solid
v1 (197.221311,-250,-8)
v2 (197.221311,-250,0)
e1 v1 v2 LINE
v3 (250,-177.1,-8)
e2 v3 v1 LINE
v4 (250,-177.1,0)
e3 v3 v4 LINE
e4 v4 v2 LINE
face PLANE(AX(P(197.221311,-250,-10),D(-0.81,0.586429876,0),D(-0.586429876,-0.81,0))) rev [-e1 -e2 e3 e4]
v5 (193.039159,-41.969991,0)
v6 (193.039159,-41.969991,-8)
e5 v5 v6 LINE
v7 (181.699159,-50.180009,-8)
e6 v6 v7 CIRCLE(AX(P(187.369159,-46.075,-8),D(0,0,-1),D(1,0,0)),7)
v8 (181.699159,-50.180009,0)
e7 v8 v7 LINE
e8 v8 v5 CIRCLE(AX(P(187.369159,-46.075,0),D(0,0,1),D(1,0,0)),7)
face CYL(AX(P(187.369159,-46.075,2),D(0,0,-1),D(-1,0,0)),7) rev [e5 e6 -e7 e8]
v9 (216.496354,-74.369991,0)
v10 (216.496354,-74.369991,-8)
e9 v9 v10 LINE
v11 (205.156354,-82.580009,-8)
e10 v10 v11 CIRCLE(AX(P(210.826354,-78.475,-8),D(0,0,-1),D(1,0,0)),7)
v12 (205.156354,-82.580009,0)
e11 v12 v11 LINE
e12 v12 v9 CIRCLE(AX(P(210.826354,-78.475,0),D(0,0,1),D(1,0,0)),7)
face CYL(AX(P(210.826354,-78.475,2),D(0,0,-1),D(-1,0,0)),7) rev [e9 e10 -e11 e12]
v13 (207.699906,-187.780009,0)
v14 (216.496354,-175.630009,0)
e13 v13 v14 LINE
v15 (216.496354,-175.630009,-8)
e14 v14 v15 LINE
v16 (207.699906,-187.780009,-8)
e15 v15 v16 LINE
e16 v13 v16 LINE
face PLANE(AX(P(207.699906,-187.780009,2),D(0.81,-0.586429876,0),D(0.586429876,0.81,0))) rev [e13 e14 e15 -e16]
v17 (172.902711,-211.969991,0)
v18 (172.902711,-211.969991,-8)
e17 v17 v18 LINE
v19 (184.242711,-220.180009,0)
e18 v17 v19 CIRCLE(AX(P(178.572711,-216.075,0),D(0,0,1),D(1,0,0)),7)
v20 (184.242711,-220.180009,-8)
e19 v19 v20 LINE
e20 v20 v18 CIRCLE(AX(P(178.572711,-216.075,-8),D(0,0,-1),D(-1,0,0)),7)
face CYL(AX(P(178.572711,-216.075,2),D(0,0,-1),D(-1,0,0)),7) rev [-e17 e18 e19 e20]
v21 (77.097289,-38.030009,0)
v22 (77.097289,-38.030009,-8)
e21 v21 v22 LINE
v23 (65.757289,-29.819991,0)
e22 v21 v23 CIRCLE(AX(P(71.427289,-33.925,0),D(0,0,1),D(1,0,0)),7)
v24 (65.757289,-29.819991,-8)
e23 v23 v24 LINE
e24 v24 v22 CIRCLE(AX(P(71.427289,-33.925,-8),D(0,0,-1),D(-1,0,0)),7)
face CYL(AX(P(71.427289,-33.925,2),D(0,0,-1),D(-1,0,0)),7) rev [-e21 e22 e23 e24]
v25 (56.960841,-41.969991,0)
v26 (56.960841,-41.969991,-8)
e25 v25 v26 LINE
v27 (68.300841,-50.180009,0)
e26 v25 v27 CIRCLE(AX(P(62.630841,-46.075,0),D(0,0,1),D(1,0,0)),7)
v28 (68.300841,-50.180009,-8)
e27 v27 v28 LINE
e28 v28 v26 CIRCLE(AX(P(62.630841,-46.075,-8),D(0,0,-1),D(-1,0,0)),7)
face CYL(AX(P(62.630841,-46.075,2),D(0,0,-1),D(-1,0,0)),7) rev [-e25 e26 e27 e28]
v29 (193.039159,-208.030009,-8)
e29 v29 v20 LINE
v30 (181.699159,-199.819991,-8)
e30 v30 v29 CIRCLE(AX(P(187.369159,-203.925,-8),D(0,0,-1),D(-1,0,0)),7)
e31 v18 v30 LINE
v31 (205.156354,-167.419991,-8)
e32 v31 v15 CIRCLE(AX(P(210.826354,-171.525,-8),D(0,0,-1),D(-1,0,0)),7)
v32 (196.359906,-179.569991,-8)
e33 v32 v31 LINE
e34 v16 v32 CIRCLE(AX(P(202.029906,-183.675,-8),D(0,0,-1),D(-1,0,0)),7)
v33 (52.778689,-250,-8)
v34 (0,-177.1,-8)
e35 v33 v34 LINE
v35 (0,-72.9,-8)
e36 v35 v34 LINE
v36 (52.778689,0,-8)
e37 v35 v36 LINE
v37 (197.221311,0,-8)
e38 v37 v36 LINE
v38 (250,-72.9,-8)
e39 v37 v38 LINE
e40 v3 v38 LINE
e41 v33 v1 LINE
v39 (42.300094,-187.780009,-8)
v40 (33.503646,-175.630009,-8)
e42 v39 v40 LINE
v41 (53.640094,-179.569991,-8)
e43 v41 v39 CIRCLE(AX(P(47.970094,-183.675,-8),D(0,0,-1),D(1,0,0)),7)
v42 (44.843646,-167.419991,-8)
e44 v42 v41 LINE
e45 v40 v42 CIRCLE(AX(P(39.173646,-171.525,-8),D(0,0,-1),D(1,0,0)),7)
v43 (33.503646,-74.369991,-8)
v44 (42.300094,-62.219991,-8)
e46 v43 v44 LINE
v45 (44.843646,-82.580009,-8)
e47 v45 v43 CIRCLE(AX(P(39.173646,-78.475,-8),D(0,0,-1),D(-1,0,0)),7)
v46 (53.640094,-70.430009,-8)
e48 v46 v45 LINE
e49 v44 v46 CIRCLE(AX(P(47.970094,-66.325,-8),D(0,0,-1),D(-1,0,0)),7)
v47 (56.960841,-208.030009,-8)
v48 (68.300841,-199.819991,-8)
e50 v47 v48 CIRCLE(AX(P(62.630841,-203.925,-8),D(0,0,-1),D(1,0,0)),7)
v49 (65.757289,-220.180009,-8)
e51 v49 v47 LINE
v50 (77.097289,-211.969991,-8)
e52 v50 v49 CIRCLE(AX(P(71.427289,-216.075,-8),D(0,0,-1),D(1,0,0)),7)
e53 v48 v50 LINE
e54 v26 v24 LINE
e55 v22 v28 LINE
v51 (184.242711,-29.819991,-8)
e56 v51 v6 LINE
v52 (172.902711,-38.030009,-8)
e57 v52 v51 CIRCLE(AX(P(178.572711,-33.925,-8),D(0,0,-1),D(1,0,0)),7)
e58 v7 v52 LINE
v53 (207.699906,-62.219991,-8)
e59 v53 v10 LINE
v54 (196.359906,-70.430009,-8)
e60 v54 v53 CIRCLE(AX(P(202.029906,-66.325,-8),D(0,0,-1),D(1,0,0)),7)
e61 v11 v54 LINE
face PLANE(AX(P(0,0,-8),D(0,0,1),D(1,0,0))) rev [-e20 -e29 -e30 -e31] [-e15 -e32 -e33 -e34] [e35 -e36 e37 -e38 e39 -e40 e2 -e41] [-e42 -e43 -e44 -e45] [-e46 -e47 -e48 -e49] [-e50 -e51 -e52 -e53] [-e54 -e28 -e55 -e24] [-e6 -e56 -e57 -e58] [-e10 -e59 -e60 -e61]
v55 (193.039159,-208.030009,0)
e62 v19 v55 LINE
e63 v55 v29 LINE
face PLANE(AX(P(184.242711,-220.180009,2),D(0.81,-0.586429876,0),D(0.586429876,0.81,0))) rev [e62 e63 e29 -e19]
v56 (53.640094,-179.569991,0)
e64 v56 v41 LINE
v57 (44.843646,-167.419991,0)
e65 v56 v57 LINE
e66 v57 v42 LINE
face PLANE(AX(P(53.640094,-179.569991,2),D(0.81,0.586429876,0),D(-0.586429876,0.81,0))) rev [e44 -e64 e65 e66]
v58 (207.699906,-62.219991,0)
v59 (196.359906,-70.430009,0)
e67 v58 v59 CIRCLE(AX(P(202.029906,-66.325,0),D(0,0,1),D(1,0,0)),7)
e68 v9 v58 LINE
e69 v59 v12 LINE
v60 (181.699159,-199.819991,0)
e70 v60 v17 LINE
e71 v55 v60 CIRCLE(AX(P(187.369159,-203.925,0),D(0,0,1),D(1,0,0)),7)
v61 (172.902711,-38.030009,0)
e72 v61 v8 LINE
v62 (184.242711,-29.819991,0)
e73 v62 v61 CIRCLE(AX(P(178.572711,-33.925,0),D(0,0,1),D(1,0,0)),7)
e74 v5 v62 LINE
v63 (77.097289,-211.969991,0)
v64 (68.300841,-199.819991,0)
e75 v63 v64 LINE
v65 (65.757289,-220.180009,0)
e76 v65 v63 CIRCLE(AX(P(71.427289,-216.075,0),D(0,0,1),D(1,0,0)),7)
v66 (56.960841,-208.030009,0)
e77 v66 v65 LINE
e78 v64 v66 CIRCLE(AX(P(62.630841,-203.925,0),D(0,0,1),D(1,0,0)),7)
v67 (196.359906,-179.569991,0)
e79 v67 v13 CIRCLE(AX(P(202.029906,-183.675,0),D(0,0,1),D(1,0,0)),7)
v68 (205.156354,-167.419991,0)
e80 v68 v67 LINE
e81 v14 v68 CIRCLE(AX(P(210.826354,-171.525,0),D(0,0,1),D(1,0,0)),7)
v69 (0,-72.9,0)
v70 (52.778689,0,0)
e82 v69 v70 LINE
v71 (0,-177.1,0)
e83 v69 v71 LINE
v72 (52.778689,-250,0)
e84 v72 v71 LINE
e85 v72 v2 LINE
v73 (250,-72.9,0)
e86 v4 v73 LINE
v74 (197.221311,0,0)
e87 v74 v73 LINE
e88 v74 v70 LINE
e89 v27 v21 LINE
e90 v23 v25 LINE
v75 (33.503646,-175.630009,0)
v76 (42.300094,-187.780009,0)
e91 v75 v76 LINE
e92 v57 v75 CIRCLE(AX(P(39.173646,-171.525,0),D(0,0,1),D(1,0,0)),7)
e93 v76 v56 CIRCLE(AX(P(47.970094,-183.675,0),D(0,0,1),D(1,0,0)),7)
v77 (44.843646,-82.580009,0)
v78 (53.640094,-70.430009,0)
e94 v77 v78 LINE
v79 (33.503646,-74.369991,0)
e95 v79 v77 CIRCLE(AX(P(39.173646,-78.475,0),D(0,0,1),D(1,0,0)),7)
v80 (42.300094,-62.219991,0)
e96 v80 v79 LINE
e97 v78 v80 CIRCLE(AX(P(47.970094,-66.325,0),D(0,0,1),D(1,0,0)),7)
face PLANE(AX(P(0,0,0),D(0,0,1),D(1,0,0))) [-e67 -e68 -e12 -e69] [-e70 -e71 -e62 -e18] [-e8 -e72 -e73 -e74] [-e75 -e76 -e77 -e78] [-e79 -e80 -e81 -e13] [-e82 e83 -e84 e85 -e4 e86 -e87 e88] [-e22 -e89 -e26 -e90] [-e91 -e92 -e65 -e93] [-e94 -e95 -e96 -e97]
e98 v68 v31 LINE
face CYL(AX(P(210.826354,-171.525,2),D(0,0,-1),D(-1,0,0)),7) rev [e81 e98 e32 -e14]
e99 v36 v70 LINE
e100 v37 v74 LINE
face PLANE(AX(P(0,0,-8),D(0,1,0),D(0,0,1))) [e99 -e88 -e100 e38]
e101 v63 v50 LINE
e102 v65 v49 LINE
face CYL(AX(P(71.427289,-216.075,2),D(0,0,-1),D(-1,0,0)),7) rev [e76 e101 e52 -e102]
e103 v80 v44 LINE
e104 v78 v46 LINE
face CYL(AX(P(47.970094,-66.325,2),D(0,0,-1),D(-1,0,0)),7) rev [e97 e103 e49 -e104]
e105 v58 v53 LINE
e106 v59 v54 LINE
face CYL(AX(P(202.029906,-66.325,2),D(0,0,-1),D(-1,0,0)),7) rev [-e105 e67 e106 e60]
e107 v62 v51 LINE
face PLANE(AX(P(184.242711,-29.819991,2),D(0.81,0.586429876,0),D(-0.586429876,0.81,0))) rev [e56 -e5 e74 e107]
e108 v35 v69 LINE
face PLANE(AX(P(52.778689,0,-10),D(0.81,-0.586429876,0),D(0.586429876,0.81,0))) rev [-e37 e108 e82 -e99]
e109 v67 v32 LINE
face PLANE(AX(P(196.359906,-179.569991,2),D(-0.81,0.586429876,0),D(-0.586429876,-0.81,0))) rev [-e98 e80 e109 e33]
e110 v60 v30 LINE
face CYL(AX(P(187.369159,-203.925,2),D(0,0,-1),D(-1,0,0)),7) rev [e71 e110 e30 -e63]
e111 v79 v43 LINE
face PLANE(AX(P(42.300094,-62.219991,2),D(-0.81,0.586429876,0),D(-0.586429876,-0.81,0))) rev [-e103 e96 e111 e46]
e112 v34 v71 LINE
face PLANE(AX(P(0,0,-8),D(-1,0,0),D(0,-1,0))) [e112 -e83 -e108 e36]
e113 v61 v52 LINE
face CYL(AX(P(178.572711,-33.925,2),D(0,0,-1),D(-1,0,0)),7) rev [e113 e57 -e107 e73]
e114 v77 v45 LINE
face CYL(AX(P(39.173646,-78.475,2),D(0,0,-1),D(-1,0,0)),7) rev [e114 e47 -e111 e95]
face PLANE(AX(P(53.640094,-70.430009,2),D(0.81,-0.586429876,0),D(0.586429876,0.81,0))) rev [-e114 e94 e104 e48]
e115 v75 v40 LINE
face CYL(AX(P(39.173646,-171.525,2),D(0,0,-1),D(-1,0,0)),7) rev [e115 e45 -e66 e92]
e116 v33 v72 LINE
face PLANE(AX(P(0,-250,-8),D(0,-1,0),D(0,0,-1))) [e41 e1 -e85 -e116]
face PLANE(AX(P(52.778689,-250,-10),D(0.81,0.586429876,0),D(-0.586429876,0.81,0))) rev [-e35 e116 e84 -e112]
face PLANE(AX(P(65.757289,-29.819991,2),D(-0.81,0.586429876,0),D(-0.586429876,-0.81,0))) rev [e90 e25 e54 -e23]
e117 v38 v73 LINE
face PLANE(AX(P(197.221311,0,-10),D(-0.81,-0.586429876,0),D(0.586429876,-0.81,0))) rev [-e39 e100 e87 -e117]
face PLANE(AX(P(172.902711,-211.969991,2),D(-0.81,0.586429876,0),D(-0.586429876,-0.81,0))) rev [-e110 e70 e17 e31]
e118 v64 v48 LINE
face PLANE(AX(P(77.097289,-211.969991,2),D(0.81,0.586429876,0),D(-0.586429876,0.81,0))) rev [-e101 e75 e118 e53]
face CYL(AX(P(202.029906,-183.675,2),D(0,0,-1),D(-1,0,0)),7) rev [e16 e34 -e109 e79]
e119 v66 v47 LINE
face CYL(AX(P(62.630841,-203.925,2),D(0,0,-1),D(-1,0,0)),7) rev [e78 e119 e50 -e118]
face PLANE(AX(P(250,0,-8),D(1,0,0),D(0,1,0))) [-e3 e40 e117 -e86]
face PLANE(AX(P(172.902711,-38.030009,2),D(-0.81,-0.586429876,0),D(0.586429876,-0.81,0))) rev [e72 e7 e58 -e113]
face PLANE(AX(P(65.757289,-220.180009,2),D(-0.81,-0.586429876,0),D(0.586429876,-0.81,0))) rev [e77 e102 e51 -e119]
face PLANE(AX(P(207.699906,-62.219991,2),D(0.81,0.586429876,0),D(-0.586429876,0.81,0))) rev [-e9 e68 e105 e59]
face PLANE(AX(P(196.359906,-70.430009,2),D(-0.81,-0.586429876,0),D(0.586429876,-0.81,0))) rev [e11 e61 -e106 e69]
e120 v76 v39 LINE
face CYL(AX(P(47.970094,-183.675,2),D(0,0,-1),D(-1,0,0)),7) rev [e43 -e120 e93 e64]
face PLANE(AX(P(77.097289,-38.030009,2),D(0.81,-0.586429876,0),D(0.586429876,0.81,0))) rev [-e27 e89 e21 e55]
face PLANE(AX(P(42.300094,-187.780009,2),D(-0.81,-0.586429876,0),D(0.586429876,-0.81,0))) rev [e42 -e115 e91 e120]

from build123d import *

# Parameters (mm, degrees)
SKETCH_1_W             = 250
SKETCH_1_H             = 250
SM_BASE_FLANGE_1_DEPTH = 8
CUT_EXTRUDE_1_DEPTH    = 10
CUT_EXTRUDE_2_DEPTH    = 10


# Sheet-metal steps are written as plain solids
with BuildPart() as part:
    # Sketch 1 → Базовая кромка1 (new body)
    with BuildSketch(Plane.XY):
        with Locations((125, -125)):
            Rectangle(SKETCH_1_W, SKETCH_1_H)
    extrude(amount=-SM_BASE_FLANGE_1_DEPTH)

    # Sketch 2 → Вырез-Вытянуть1 (cut)
    with BuildSketch(Plane.XY):
        Polygon((52.778688881, 0), (0, -72.9), (0, 0), align=None)
        Polygon((250, 0), (197.221311119, 0), (250, -72.9), align=None)
        Polygon((197.221311119, -250), (250, -177.1), (250, -250), align=None)
        Polygon((0, -250), (52.778688881, -250), (0, -177.1), align=None)
    extrude(amount=-CUT_EXTRUDE_1_DEPTH, mode=Mode.SUBTRACT)

    # Эскиз3 → Вырез-Вытянуть2 (cut)
    with BuildSketch(Plane(origin=(0, 0, -8), x_dir=(-1, 0, 0), z_dir=(0, 0, -1))):
        with BuildLine():
            Line((-65.757289426, -29.819990865), (-56.960841279, -41.969990865))
            ThreePointArc((-56.960841279, -41.969990865), (-58.525832144, -51.745), (-68.300841279, -50.180009135))
            Line((-68.300841279, -50.180009135), (-77.097289426, -38.030009135))
            ThreePointArc((-77.097289426, -38.030009135), (-75.532298561, -28.255), (-65.757289426, -29.819990865))
        make_face()
        with BuildLine():
            Line((-42.300094368, -62.219990865), (-33.503646221, -74.369990865))
            ThreePointArc((-33.503646221, -74.369990865), (-35.068637085, -84.145), (-44.843646221, -82.580009135))
            Line((-44.843646221, -82.580009135), (-53.640094368, -70.430009135))
            ThreePointArc((-53.640094368, -70.430009135), (-52.075103503, -60.655), (-42.300094368, -62.219990865))
        make_face()
        with BuildLine():
            Line((-184.242710574, -29.819990865), (-193.039158721, -41.969990865))
            ThreePointArc((-193.039158721, -41.969990865), (-191.474167856, -51.745), (-181.699158721, -50.180009135))
            Line((-181.699158721, -50.180009135), (-172.902710574, -38.030009135))
            ThreePointArc((-172.902710574, -38.030009135), (-174.467701439, -28.255), (-184.242710574, -29.819990865))
        make_face()
        with BuildLine():
            Line((-207.699905632, -62.219990865), (-216.496353779, -74.369990865))
            ThreePointArc((-216.496353779, -74.369990865), (-214.931362915, -84.145), (-205.156353779, -82.580009135))
            Line((-205.156353779, -82.580009135), (-196.359905632, -70.430009135))
            ThreePointArc((-196.359905632, -70.430009135), (-197.924896497, -60.655), (-207.699905632, -62.219990865))
        make_face()
        with BuildLine():
            Line((-65.757289426, -220.180009135), (-56.960841279, -208.030009135))
            ThreePointArc((-56.960841279, -208.030009135), (-58.525832144, -198.255), (-68.300841279, -199.819990865))
            Line((-68.300841279, -199.819990865), (-77.097289426, -211.969990865))
            ThreePointArc((-77.097289426, -211.969990865), (-75.532298561, -221.745), (-65.757289426, -220.180009135))
        make_face()
        with BuildLine():
            Line((-42.300094368, -187.780009135), (-33.503646221, -175.630009135))
            ThreePointArc((-33.503646221, -175.630009135), (-35.068637085, -165.855), (-44.843646221, -167.419990865))
            Line((-44.843646221, -167.419990865), (-53.640094368, -179.569990865))
            ThreePointArc((-53.640094368, -179.569990865), (-52.075103503, -189.345), (-42.300094368, -187.780009135))
        make_face()
        with BuildLine():
            Line((-184.242710574, -220.180009135), (-193.039158721, -208.030009135))
            ThreePointArc((-193.039158721, -208.030009135), (-191.474167856, -198.255), (-181.699158721, -199.819990865))
            Line((-181.699158721, -199.819990865), (-172.902710574, -211.969990865))
            ThreePointArc((-172.902710574, -211.969990865), (-174.467701439, -221.745), (-184.242710574, -220.180009135))
        make_face()
        with BuildLine():
            Line((-207.699905632, -187.780009135), (-216.496353779, -175.630009135))
            ThreePointArc((-216.496353779, -175.630009135), (-214.931362915, -165.855), (-205.156353779, -167.419990865))
            Line((-205.156353779, -167.419990865), (-196.359905632, -179.569990865))
            ThreePointArc((-196.359905632, -179.569990865), (-197.924896497, -189.345), (-207.699905632, -187.780009135))
        make_face()
    extrude(amount=-CUT_EXTRUDE_2_DEPTH, mode=Mode.SUBTRACT)


solid = part.part
